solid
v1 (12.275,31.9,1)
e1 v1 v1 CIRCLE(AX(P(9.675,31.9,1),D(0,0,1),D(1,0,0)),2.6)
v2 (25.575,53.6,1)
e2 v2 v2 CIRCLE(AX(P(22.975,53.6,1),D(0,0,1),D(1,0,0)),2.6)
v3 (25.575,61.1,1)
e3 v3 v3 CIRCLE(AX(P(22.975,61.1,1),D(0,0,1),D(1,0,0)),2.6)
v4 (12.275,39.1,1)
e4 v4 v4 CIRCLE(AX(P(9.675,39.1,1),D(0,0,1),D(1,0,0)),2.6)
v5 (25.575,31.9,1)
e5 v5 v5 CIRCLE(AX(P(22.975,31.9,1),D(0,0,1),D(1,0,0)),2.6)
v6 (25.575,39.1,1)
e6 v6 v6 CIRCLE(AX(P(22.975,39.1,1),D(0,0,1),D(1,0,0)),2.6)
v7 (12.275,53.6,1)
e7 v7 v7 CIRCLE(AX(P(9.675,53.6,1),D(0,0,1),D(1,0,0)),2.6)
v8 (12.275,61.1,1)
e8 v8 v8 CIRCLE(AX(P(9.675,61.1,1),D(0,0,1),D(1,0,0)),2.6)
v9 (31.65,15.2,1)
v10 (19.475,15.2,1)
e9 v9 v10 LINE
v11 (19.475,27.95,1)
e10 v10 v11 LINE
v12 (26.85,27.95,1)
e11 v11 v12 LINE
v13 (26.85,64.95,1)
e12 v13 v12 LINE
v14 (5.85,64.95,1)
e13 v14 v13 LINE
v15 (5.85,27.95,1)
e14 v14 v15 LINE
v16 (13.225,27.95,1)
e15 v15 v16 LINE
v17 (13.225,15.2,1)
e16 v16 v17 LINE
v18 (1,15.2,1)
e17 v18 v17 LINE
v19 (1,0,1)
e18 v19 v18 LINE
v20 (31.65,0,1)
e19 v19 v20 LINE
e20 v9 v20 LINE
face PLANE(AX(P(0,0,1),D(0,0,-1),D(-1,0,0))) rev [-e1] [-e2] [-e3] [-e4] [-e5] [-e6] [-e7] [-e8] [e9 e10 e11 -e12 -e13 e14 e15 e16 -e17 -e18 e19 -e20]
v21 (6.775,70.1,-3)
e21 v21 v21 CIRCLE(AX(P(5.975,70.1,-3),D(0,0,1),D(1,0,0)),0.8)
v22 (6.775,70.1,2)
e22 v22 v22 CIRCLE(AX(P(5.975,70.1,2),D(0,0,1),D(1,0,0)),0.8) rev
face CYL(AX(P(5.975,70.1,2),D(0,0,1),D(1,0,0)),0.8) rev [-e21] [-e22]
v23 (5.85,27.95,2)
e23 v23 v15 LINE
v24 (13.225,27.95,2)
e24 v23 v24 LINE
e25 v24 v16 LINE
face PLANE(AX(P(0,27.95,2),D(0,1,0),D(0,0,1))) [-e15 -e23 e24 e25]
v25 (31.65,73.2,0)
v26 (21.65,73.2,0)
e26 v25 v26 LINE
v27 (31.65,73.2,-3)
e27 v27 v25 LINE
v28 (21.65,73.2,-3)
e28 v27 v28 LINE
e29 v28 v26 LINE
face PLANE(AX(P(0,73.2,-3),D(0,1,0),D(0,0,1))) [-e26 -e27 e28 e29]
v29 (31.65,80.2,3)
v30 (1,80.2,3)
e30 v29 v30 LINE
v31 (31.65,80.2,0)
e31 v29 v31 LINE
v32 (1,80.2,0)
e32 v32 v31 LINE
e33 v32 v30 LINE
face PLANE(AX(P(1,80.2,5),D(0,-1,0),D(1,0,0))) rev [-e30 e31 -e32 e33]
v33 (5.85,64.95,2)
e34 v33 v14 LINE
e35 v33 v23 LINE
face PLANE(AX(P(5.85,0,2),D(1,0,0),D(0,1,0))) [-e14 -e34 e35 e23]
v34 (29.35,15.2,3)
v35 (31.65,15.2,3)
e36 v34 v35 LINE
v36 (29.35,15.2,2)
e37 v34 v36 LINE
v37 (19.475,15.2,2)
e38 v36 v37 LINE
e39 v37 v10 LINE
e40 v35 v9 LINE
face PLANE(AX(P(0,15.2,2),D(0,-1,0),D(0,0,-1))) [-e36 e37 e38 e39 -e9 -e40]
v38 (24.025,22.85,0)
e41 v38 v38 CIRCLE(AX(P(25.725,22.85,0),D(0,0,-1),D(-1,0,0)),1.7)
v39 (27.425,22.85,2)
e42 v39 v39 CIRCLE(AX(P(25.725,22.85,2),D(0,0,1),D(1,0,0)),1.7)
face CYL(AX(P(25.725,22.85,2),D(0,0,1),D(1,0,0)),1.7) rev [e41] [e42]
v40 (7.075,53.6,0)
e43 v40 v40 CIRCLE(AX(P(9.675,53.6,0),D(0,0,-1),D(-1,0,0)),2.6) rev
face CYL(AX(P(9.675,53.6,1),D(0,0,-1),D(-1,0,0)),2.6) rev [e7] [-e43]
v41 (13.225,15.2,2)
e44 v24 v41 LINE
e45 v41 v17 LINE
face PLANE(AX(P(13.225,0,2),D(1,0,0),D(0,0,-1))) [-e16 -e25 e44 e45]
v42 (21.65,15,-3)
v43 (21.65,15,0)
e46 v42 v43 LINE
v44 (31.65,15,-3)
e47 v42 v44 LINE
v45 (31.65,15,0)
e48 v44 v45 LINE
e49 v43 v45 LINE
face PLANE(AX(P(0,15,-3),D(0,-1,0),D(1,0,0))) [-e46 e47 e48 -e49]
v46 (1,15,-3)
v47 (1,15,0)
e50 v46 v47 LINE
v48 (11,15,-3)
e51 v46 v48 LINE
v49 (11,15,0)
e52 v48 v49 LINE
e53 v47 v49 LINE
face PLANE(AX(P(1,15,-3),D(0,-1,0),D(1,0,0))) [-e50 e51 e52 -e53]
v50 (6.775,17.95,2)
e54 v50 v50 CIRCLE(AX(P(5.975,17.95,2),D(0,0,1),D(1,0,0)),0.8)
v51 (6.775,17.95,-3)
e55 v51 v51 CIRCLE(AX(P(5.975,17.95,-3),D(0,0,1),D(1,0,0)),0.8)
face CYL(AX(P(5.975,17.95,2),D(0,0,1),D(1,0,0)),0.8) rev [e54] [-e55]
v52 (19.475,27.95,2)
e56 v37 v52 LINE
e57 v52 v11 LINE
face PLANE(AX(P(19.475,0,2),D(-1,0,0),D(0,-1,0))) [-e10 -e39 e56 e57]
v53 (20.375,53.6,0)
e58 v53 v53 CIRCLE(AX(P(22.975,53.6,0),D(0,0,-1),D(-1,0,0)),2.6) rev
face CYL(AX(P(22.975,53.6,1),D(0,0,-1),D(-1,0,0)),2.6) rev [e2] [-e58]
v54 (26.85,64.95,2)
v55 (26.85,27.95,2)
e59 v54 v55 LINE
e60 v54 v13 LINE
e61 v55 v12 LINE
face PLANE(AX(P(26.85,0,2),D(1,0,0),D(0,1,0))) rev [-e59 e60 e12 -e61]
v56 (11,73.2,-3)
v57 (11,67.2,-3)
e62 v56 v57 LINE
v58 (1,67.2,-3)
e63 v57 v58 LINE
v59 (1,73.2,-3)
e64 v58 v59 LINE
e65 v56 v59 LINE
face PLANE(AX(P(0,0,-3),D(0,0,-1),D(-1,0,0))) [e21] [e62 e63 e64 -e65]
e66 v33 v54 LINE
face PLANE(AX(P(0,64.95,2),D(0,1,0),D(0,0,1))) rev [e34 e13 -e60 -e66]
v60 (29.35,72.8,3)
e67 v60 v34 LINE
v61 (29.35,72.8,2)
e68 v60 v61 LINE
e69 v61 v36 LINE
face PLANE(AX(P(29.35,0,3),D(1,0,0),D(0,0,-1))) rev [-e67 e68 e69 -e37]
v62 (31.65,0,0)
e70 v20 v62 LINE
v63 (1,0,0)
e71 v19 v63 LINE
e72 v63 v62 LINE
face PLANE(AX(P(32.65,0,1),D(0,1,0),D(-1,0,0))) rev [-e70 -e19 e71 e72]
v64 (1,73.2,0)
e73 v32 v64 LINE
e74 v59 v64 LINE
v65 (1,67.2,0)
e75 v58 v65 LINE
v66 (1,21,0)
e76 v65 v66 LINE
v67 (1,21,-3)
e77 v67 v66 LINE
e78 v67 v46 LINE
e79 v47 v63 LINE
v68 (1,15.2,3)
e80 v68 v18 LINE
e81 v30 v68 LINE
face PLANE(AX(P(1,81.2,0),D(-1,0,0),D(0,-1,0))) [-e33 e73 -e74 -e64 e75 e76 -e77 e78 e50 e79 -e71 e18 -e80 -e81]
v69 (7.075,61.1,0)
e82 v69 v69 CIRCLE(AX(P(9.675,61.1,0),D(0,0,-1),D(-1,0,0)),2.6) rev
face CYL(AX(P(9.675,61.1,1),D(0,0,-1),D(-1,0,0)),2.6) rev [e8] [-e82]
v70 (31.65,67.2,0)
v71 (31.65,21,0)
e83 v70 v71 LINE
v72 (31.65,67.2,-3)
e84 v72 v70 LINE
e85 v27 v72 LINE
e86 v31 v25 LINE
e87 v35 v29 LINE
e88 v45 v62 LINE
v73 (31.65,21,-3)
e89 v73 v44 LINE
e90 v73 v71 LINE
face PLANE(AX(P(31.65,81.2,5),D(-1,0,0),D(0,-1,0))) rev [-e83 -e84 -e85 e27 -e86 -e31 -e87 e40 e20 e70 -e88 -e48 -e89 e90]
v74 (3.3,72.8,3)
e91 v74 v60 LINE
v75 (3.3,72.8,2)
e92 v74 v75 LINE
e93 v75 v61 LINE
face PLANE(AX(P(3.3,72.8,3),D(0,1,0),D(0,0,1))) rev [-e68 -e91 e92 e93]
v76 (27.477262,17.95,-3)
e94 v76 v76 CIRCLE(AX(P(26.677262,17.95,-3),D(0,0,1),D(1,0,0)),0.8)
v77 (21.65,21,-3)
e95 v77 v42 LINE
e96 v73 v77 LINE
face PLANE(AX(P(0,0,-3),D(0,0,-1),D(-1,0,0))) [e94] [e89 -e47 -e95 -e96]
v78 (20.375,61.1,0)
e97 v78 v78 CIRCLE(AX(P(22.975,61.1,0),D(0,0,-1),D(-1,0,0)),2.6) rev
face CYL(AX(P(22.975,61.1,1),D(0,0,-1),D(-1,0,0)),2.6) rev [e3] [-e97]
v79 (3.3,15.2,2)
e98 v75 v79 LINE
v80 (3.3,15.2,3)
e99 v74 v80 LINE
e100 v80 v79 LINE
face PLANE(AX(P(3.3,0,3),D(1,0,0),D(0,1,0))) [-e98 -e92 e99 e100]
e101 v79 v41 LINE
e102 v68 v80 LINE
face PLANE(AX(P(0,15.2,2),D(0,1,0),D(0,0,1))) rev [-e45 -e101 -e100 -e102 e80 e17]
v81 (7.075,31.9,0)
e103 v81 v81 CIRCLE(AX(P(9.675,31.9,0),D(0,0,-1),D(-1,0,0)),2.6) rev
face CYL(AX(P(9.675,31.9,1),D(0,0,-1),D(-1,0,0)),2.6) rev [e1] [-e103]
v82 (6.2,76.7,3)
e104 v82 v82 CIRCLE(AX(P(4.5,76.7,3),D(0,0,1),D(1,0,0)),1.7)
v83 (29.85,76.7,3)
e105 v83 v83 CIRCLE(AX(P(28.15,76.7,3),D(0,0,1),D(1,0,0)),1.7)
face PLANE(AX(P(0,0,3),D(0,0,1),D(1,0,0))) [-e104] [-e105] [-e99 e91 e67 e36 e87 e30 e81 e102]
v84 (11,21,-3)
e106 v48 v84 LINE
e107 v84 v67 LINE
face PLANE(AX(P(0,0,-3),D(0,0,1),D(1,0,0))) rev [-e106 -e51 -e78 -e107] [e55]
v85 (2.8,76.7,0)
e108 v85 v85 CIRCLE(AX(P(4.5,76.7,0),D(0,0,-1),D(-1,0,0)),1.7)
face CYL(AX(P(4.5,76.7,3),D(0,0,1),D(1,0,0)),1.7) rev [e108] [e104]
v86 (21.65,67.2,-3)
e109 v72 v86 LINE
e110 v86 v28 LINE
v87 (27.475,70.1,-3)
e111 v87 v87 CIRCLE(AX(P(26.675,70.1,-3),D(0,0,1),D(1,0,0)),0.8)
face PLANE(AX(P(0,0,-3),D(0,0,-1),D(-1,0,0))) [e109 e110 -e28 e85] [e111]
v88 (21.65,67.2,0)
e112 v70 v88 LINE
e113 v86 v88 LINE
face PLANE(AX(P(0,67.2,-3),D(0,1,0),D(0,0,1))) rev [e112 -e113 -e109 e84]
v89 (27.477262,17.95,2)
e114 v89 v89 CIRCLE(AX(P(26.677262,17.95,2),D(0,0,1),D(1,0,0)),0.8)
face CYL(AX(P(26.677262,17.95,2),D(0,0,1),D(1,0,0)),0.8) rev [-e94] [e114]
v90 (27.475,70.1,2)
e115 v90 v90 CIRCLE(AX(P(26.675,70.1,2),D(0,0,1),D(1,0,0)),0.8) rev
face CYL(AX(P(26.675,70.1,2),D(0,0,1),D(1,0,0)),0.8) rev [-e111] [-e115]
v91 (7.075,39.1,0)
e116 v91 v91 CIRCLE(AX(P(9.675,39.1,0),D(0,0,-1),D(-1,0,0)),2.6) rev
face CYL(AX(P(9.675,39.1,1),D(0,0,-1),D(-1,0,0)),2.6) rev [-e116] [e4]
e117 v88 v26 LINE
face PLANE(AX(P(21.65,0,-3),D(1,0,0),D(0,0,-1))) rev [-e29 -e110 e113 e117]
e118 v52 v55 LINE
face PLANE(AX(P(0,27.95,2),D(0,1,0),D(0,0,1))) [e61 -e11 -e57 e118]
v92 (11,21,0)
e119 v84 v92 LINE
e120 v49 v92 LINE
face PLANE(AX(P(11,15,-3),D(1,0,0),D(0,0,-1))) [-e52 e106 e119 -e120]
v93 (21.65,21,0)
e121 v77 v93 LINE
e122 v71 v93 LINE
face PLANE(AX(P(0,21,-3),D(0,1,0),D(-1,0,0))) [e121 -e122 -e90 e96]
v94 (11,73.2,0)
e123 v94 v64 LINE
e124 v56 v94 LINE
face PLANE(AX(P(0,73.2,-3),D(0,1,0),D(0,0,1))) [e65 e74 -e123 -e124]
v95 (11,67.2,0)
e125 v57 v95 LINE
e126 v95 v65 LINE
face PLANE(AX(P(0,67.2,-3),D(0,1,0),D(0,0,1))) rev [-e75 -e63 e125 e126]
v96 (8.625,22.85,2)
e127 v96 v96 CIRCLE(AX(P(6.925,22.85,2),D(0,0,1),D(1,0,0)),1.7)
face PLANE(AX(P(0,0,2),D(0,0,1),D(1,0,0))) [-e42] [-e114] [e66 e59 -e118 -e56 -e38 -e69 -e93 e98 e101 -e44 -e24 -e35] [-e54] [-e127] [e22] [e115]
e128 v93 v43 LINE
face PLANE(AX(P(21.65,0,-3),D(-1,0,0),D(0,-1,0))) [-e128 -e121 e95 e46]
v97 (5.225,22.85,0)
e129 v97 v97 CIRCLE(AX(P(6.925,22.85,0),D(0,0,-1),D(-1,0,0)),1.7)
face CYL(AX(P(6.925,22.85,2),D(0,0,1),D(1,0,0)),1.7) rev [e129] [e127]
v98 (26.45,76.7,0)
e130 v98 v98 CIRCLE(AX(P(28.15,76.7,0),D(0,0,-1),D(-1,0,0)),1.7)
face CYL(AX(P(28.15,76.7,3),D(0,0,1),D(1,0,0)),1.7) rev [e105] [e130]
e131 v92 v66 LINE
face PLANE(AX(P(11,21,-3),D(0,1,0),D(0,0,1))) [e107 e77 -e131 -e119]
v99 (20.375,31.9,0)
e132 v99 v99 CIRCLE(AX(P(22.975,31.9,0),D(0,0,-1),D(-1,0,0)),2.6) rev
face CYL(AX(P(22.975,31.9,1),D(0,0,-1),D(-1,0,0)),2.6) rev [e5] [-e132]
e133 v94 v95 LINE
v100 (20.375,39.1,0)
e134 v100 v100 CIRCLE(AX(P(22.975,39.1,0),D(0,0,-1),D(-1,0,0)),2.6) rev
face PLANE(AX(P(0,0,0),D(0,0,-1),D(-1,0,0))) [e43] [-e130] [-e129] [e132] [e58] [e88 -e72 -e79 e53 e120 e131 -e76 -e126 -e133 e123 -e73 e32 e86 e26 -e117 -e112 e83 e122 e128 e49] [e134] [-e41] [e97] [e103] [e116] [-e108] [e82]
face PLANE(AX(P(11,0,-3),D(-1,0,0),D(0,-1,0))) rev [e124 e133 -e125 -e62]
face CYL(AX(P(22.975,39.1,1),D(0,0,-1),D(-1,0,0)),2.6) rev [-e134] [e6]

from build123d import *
from build123d.topology import SkipClean

# Parameters (mm, degrees)
SKETCH1_W                   = 32.65
SKETCH1_H                   = 81.2
BOSS_EXTRUDE1_DEPTH         = 1
BOSS_EXTRUDE2_DEPTH         = 4
SKETCH3_W                   = 5.2
SKETCH3_H                   = 5.2
BOSS_EXTRUDE3_DEPTH         = 1
F_3DSKETCH1_R               = 2
CUT_EXTRUDE13_DEPTH         = 15
F_3DSKETCH2_R               = 2.6
CUT_EXTRUDE14_DEPTH         = 24
CUT_EXTRUDE20_START         = -6.9
SKETCH7_R                   = 2
CUT_EXTRUDE20_DEPTH         = 6.9
SKETCH8_W                   = 1
SKETCH8_H                   = 5
CUT_EXTRUDE21_DEPTH         = 88.661066044
SKETCH9_W                   = 5
SKETCH9_H                   = 1
CUT_EXTRUDE23_DEPTH         = 87.935967815
SKETCH11_W                  = 10
SKETCH11_H                  = 6
BOSS_EXTRUDE4_DEPTH         = 3
TAP_DRILL_FOR_M2X0_4_TAP1_D = 1.6
TAP_DRILL_FOR_M2X0_4_TAP2_D = 1.6
SKETCH37_R                  = 0.8
BOSS_EXTRUDE11_DEPTH        = 1
SKETCH40_W                  = 2.3
SKETCH40_H                  = 65
BOSS_EXTRUDE12_DEPTH        = 1
SKETCH41_W                  = 26.05
SKETCH41_H                  = 7.4
BOSS_EXTRUDE13_DEPTH        = 1
M3_CLEARANCE_HOLE1_D        = 3.4
M3_CLEARANCE_HOLE2_D        = 3.4


with BuildPart() as part:
    # Sketch1 → Boss-Extrude1 (new body)
    with BuildSketch(Plane.XY):
        with Locations((16.325, 40.6)):
            Rectangle(SKETCH1_W, SKETCH1_H)
    extrude(amount=BOSS_EXTRUDE1_DEPTH)

    # Sketch2 → Boss-Extrude2 (add)
    with BuildSketch(Plane.XY.offset(1)):
        Polygon((0, 0), (0, 81.2), (32.65, 81.2), (32.65, 0), (31.65, 0), (31.65, 80.2), (1, 80.2), (1, 0), align=None)
    extrude(amount=BOSS_EXTRUDE2_DEPTH)

    # Sketch3 → Boss-Extrude3 (add)
    with BuildSketch(Plane.XY.offset(1)):
        with Locations((3.6, 77.6)):
            Rectangle(SKETCH3_W, SKETCH3_H)
        with Locations((3.6, 17.8)):
            Rectangle(SKETCH3_W, SKETCH3_H)
        with Locations((29.05, 17.8)):
            Rectangle(SKETCH3_W, SKETCH3_H)
        with Locations((29.05, 77.6)):
            Rectangle(SKETCH3_W, SKETCH3_H)
    extrude(amount=BOSS_EXTRUDE3_DEPTH)

    # 3DSketch1 → Cut-Extrude13 (cut)
    with BuildSketch(Plane(origin=(11.325, 80.2, 4), x_dir=(1, 0, 0), z_dir=(0, -1, 0))):
        Circle(F_3DSKETCH1_R)
        with Locations((10, 0)):
            Circle(F_3DSKETCH1_R)
    extrude(amount=-CUT_EXTRUDE13_DEPTH, mode=Mode.SUBTRACT)

    # 3DSketch2 → Cut-Extrude14 (cut)
    with BuildSketch(Plane(origin=(9.675, 61.1, 1), x_dir=(0.4145072564800623, -0.910046006708107, 0), z_dir=(0, 0, 1))):
        with Locations(Location((0, 0, 0), (0, 0, 245.511710088))):
            Circle(F_3DSKETCH2_R)
        with Locations(Location((5.512946511, 12.103611889, 0), (0, 0, 245.511710088))):
            Circle(F_3DSKETCH2_R)
        with Locations(Location((6.82534505, -3.108804424, 0), (0, 0, 245.511710088))):
            Circle(F_3DSKETCH2_R)
        with Locations(Location((12.338291561, 8.994807466, 0), (0, 0, 245.511710088))):
            Circle(F_3DSKETCH2_R)
        with Locations(Location((20.021012148, -9.119159643, 0), (0, 0, 245.511710088))):
            Circle(F_3DSKETCH2_R)
        with Locations(Location((25.533958659, 2.984452247, 0), (0, 0, 245.511710088))):
            Circle(F_3DSKETCH2_R)
        with Locations(Location((26.573343396, -12.103611889, 0), (0, 0, 245.511710088))):
            Circle(F_3DSKETCH2_R)
        with Locations(Location((32.086289907, 0, 0), (0, 0, 245.511710088))):
            Circle(F_3DSKETCH2_R)
    extrude(amount=-CUT_EXTRUDE14_DEPTH, mode=Mode.SUBTRACT)

    # Sketch7 → Cut-Extrude20 (cut)
    with BuildSketch(Plane(origin=(0, 81.2, 0), x_dir=(1, 0, 0), z_dir=(0, 1, 0)).offset(CUT_EXTRUDE20_START)):
        with BuildLine():
            ThreePointArc((13.057050808, -5), (13.256851653, -4.51763809), (13.325, -4))
            ThreePointArc((13.325, -4), (10.80736191, -2.068148347), (9.592949192, -5))
            Line((9.592949192, -5), (13.057050808, -5))
        make_face()
        with BuildLine():
            Line((13.057050808, -5), (9.592949192, -5))
            ThreePointArc((9.592949192, -5), (11.325, -6), (13.057050808, -5))
        make_face()
        with BuildLine():
            ThreePointArc((9.592949192, -5), (11.325, -2), (13.057050808, -5))
            Line((13.057050808, -5), (9.592949192, -5))
        make_face()
        with Locations((21.308255446, -4.002965824)):
            Circle(SKETCH7_R)
    extrude(amount=CUT_EXTRUDE20_DEPTH, mode=Mode.SUBTRACT)

    # Sketch8 → Cut-Extrude21 (cut, through all)
    with BuildSketch(Plane.XZ):
        Polygon((1, 5), (0, 5), (0, 0), (1, 0), (1, 1), align=None)
        with Locations((32.15, 2.5)):
            Rectangle(SKETCH8_W, SKETCH8_H)
    extrude(amount=-CUT_EXTRUDE21_DEPTH, mode=Mode.SUBTRACT)

    # Sketch9 → Cut-Extrude23 (cut, through all)
    with BuildSketch(Plane(origin=(31.65, 0, 0), x_dir=(0, 0, -1), z_dir=(1, 0, 0))):
        with Locations((-2.5, 80.7)):
            Rectangle(SKETCH9_W, SKETCH9_H)
    extrude(amount=-CUT_EXTRUDE23_DEPTH, mode=Mode.SUBTRACT)

    # Sketch11 → Boss-Extrude4 (add)
    with BuildSketch(Plane(origin=(0, 0, 0), x_dir=(-1, 0, 0), z_dir=(0, 0, -1))):
        with Locations((-26.65, 18)):
            Rectangle(SKETCH11_W, SKETCH11_H)
        with Locations((-26.65, 70.2)):
            Rectangle(SKETCH11_W, SKETCH11_H)
        with Locations((-6, 70.2)):
            Rectangle(SKETCH11_W, SKETCH11_H)
        with Locations((-6, 18)):
            Rectangle(SKETCH11_W, SKETCH11_H)
    extrude(amount=BOSS_EXTRUDE4_DEPTH)

    # Tap Drill for M2x0.4 Tap1 (through all)
    with Locations(Plane(origin=(26.675, 70.1, 2), x_dir=(1, 0, 0), z_dir=(0, 0, 1))):
        with Locations((0, 0)):
            Hole(TAP_DRILL_FOR_M2X0_4_TAP1_D / 2)

    # Tap Drill for M2x0.4 Tap2 (through all)
    with Locations(Plane(origin=(5.975, 70.1, 2), x_dir=(1, 0, 0), z_dir=(0, 0, 1))):
        with Locations((0, 0), (0, -52.15), (20.702261821, -52.15)):
            Hole(TAP_DRILL_FOR_M2X0_4_TAP2_D / 2)

    # Sketch37 → Boss-Extrude11 (add)
    with SkipClean():  # the faces are left unmerged after this step: merging them gives an invalid solid
        with BuildSketch(Plane.XY.offset(1)):
            with BuildLine():
                Line((26.85, 64.95), (26.85, 27.95))
                Line((26.85, 27.95), (19.475, 27.95))
                Line((19.475, 27.95), (19.475, 15.2))
                Line((19.475, 15.2), (26.45, 15.2))
                Line((26.45, 15.2), (26.45, 17.18295889))
                ThreePointArc((26.45, 17.18295889), (25.877261821, 17.95), (26.45, 18.71704111))
                Line((26.45, 18.71704111), (26.45, 20.4))
                Line((26.45, 20.4), (31.65, 20.4))
                Line((31.65, 20.4), (31.65, 75))
                Line((31.65, 75), (26.45, 75))
                Line((26.45, 75), (26.45, 80.2))
                Line((26.45, 80.2), (6.2, 80.2))
                Line((6.2, 80.2), (6.2, 75))
                Line((6.2, 75), (1, 75))
                Line((1, 75), (1, 20.4))
                Line((1, 20.4), (6.2, 20.4))
                Line((6.2, 20.4), (6.2, 18.717707627))
                ThreePointArc((6.2, 18.717707627), (6.775, 17.95), (6.2, 17.182292373))
                Line((6.2, 17.182292373), (6.2, 15.2))
                Line((6.2, 15.2), (13.225, 15.2))
                Line((13.225, 15.2), (13.225, 27.95))
                Line((13.225, 27.95), (5.85, 27.95))
                Line((5.85, 27.95), (5.85, 64.95))
                Line((5.85, 64.95), (26.85, 64.95))
            make_face()
            with Locations((5.975, 70.1)):
                Circle(SKETCH37_R, mode=Mode.SUBTRACT)
            with Locations((26.675, 70.1)):
                Circle(SKETCH37_R, mode=Mode.SUBTRACT)
        extrude(amount=BOSS_EXTRUDE11_DEPTH)
    add(part.part.scale(1), mode=Mode.REPLACE)  # the faces are merged on a copy

    # Sketch40 → Boss-Extrude12 (add)
    with BuildSketch(Plane.XY.offset(2)):
        with Locations((30.5, 47.7)):
            Rectangle(SKETCH40_W, SKETCH40_H)
        with Locations((2.15, 47.7)):
            Rectangle(SKETCH40_W, SKETCH40_H)
    extrude(amount=BOSS_EXTRUDE12_DEPTH)

    # Sketch41 → Boss-Extrude13 (add)
    with BuildSketch(Plane.XY.offset(2)):
        with Locations((16.325, 76.5)):
            Rectangle(SKETCH41_W, SKETCH41_H)
    extrude(amount=BOSS_EXTRUDE13_DEPTH)

    # M3 Clearance Hole1 (through all)
    with Locations(Plane(origin=(4.5, 76.7, 3), x_dir=(1, 0, 0), z_dir=(0, 0, 1))):
        with Locations((0, 0), (23.65, 0)):
            Hole(M3_CLEARANCE_HOLE1_D / 2)

    # M3 Clearance Hole2 (through all)
    with Locations(Plane(origin=(6.925, 22.85, 2), x_dir=(1, 0, 0), z_dir=(0, 0, 1))):
        with Locations((0, 0), (18.8, 0)):
            Hole(M3_CLEARANCE_HOLE2_D / 2)


solid = part.part
